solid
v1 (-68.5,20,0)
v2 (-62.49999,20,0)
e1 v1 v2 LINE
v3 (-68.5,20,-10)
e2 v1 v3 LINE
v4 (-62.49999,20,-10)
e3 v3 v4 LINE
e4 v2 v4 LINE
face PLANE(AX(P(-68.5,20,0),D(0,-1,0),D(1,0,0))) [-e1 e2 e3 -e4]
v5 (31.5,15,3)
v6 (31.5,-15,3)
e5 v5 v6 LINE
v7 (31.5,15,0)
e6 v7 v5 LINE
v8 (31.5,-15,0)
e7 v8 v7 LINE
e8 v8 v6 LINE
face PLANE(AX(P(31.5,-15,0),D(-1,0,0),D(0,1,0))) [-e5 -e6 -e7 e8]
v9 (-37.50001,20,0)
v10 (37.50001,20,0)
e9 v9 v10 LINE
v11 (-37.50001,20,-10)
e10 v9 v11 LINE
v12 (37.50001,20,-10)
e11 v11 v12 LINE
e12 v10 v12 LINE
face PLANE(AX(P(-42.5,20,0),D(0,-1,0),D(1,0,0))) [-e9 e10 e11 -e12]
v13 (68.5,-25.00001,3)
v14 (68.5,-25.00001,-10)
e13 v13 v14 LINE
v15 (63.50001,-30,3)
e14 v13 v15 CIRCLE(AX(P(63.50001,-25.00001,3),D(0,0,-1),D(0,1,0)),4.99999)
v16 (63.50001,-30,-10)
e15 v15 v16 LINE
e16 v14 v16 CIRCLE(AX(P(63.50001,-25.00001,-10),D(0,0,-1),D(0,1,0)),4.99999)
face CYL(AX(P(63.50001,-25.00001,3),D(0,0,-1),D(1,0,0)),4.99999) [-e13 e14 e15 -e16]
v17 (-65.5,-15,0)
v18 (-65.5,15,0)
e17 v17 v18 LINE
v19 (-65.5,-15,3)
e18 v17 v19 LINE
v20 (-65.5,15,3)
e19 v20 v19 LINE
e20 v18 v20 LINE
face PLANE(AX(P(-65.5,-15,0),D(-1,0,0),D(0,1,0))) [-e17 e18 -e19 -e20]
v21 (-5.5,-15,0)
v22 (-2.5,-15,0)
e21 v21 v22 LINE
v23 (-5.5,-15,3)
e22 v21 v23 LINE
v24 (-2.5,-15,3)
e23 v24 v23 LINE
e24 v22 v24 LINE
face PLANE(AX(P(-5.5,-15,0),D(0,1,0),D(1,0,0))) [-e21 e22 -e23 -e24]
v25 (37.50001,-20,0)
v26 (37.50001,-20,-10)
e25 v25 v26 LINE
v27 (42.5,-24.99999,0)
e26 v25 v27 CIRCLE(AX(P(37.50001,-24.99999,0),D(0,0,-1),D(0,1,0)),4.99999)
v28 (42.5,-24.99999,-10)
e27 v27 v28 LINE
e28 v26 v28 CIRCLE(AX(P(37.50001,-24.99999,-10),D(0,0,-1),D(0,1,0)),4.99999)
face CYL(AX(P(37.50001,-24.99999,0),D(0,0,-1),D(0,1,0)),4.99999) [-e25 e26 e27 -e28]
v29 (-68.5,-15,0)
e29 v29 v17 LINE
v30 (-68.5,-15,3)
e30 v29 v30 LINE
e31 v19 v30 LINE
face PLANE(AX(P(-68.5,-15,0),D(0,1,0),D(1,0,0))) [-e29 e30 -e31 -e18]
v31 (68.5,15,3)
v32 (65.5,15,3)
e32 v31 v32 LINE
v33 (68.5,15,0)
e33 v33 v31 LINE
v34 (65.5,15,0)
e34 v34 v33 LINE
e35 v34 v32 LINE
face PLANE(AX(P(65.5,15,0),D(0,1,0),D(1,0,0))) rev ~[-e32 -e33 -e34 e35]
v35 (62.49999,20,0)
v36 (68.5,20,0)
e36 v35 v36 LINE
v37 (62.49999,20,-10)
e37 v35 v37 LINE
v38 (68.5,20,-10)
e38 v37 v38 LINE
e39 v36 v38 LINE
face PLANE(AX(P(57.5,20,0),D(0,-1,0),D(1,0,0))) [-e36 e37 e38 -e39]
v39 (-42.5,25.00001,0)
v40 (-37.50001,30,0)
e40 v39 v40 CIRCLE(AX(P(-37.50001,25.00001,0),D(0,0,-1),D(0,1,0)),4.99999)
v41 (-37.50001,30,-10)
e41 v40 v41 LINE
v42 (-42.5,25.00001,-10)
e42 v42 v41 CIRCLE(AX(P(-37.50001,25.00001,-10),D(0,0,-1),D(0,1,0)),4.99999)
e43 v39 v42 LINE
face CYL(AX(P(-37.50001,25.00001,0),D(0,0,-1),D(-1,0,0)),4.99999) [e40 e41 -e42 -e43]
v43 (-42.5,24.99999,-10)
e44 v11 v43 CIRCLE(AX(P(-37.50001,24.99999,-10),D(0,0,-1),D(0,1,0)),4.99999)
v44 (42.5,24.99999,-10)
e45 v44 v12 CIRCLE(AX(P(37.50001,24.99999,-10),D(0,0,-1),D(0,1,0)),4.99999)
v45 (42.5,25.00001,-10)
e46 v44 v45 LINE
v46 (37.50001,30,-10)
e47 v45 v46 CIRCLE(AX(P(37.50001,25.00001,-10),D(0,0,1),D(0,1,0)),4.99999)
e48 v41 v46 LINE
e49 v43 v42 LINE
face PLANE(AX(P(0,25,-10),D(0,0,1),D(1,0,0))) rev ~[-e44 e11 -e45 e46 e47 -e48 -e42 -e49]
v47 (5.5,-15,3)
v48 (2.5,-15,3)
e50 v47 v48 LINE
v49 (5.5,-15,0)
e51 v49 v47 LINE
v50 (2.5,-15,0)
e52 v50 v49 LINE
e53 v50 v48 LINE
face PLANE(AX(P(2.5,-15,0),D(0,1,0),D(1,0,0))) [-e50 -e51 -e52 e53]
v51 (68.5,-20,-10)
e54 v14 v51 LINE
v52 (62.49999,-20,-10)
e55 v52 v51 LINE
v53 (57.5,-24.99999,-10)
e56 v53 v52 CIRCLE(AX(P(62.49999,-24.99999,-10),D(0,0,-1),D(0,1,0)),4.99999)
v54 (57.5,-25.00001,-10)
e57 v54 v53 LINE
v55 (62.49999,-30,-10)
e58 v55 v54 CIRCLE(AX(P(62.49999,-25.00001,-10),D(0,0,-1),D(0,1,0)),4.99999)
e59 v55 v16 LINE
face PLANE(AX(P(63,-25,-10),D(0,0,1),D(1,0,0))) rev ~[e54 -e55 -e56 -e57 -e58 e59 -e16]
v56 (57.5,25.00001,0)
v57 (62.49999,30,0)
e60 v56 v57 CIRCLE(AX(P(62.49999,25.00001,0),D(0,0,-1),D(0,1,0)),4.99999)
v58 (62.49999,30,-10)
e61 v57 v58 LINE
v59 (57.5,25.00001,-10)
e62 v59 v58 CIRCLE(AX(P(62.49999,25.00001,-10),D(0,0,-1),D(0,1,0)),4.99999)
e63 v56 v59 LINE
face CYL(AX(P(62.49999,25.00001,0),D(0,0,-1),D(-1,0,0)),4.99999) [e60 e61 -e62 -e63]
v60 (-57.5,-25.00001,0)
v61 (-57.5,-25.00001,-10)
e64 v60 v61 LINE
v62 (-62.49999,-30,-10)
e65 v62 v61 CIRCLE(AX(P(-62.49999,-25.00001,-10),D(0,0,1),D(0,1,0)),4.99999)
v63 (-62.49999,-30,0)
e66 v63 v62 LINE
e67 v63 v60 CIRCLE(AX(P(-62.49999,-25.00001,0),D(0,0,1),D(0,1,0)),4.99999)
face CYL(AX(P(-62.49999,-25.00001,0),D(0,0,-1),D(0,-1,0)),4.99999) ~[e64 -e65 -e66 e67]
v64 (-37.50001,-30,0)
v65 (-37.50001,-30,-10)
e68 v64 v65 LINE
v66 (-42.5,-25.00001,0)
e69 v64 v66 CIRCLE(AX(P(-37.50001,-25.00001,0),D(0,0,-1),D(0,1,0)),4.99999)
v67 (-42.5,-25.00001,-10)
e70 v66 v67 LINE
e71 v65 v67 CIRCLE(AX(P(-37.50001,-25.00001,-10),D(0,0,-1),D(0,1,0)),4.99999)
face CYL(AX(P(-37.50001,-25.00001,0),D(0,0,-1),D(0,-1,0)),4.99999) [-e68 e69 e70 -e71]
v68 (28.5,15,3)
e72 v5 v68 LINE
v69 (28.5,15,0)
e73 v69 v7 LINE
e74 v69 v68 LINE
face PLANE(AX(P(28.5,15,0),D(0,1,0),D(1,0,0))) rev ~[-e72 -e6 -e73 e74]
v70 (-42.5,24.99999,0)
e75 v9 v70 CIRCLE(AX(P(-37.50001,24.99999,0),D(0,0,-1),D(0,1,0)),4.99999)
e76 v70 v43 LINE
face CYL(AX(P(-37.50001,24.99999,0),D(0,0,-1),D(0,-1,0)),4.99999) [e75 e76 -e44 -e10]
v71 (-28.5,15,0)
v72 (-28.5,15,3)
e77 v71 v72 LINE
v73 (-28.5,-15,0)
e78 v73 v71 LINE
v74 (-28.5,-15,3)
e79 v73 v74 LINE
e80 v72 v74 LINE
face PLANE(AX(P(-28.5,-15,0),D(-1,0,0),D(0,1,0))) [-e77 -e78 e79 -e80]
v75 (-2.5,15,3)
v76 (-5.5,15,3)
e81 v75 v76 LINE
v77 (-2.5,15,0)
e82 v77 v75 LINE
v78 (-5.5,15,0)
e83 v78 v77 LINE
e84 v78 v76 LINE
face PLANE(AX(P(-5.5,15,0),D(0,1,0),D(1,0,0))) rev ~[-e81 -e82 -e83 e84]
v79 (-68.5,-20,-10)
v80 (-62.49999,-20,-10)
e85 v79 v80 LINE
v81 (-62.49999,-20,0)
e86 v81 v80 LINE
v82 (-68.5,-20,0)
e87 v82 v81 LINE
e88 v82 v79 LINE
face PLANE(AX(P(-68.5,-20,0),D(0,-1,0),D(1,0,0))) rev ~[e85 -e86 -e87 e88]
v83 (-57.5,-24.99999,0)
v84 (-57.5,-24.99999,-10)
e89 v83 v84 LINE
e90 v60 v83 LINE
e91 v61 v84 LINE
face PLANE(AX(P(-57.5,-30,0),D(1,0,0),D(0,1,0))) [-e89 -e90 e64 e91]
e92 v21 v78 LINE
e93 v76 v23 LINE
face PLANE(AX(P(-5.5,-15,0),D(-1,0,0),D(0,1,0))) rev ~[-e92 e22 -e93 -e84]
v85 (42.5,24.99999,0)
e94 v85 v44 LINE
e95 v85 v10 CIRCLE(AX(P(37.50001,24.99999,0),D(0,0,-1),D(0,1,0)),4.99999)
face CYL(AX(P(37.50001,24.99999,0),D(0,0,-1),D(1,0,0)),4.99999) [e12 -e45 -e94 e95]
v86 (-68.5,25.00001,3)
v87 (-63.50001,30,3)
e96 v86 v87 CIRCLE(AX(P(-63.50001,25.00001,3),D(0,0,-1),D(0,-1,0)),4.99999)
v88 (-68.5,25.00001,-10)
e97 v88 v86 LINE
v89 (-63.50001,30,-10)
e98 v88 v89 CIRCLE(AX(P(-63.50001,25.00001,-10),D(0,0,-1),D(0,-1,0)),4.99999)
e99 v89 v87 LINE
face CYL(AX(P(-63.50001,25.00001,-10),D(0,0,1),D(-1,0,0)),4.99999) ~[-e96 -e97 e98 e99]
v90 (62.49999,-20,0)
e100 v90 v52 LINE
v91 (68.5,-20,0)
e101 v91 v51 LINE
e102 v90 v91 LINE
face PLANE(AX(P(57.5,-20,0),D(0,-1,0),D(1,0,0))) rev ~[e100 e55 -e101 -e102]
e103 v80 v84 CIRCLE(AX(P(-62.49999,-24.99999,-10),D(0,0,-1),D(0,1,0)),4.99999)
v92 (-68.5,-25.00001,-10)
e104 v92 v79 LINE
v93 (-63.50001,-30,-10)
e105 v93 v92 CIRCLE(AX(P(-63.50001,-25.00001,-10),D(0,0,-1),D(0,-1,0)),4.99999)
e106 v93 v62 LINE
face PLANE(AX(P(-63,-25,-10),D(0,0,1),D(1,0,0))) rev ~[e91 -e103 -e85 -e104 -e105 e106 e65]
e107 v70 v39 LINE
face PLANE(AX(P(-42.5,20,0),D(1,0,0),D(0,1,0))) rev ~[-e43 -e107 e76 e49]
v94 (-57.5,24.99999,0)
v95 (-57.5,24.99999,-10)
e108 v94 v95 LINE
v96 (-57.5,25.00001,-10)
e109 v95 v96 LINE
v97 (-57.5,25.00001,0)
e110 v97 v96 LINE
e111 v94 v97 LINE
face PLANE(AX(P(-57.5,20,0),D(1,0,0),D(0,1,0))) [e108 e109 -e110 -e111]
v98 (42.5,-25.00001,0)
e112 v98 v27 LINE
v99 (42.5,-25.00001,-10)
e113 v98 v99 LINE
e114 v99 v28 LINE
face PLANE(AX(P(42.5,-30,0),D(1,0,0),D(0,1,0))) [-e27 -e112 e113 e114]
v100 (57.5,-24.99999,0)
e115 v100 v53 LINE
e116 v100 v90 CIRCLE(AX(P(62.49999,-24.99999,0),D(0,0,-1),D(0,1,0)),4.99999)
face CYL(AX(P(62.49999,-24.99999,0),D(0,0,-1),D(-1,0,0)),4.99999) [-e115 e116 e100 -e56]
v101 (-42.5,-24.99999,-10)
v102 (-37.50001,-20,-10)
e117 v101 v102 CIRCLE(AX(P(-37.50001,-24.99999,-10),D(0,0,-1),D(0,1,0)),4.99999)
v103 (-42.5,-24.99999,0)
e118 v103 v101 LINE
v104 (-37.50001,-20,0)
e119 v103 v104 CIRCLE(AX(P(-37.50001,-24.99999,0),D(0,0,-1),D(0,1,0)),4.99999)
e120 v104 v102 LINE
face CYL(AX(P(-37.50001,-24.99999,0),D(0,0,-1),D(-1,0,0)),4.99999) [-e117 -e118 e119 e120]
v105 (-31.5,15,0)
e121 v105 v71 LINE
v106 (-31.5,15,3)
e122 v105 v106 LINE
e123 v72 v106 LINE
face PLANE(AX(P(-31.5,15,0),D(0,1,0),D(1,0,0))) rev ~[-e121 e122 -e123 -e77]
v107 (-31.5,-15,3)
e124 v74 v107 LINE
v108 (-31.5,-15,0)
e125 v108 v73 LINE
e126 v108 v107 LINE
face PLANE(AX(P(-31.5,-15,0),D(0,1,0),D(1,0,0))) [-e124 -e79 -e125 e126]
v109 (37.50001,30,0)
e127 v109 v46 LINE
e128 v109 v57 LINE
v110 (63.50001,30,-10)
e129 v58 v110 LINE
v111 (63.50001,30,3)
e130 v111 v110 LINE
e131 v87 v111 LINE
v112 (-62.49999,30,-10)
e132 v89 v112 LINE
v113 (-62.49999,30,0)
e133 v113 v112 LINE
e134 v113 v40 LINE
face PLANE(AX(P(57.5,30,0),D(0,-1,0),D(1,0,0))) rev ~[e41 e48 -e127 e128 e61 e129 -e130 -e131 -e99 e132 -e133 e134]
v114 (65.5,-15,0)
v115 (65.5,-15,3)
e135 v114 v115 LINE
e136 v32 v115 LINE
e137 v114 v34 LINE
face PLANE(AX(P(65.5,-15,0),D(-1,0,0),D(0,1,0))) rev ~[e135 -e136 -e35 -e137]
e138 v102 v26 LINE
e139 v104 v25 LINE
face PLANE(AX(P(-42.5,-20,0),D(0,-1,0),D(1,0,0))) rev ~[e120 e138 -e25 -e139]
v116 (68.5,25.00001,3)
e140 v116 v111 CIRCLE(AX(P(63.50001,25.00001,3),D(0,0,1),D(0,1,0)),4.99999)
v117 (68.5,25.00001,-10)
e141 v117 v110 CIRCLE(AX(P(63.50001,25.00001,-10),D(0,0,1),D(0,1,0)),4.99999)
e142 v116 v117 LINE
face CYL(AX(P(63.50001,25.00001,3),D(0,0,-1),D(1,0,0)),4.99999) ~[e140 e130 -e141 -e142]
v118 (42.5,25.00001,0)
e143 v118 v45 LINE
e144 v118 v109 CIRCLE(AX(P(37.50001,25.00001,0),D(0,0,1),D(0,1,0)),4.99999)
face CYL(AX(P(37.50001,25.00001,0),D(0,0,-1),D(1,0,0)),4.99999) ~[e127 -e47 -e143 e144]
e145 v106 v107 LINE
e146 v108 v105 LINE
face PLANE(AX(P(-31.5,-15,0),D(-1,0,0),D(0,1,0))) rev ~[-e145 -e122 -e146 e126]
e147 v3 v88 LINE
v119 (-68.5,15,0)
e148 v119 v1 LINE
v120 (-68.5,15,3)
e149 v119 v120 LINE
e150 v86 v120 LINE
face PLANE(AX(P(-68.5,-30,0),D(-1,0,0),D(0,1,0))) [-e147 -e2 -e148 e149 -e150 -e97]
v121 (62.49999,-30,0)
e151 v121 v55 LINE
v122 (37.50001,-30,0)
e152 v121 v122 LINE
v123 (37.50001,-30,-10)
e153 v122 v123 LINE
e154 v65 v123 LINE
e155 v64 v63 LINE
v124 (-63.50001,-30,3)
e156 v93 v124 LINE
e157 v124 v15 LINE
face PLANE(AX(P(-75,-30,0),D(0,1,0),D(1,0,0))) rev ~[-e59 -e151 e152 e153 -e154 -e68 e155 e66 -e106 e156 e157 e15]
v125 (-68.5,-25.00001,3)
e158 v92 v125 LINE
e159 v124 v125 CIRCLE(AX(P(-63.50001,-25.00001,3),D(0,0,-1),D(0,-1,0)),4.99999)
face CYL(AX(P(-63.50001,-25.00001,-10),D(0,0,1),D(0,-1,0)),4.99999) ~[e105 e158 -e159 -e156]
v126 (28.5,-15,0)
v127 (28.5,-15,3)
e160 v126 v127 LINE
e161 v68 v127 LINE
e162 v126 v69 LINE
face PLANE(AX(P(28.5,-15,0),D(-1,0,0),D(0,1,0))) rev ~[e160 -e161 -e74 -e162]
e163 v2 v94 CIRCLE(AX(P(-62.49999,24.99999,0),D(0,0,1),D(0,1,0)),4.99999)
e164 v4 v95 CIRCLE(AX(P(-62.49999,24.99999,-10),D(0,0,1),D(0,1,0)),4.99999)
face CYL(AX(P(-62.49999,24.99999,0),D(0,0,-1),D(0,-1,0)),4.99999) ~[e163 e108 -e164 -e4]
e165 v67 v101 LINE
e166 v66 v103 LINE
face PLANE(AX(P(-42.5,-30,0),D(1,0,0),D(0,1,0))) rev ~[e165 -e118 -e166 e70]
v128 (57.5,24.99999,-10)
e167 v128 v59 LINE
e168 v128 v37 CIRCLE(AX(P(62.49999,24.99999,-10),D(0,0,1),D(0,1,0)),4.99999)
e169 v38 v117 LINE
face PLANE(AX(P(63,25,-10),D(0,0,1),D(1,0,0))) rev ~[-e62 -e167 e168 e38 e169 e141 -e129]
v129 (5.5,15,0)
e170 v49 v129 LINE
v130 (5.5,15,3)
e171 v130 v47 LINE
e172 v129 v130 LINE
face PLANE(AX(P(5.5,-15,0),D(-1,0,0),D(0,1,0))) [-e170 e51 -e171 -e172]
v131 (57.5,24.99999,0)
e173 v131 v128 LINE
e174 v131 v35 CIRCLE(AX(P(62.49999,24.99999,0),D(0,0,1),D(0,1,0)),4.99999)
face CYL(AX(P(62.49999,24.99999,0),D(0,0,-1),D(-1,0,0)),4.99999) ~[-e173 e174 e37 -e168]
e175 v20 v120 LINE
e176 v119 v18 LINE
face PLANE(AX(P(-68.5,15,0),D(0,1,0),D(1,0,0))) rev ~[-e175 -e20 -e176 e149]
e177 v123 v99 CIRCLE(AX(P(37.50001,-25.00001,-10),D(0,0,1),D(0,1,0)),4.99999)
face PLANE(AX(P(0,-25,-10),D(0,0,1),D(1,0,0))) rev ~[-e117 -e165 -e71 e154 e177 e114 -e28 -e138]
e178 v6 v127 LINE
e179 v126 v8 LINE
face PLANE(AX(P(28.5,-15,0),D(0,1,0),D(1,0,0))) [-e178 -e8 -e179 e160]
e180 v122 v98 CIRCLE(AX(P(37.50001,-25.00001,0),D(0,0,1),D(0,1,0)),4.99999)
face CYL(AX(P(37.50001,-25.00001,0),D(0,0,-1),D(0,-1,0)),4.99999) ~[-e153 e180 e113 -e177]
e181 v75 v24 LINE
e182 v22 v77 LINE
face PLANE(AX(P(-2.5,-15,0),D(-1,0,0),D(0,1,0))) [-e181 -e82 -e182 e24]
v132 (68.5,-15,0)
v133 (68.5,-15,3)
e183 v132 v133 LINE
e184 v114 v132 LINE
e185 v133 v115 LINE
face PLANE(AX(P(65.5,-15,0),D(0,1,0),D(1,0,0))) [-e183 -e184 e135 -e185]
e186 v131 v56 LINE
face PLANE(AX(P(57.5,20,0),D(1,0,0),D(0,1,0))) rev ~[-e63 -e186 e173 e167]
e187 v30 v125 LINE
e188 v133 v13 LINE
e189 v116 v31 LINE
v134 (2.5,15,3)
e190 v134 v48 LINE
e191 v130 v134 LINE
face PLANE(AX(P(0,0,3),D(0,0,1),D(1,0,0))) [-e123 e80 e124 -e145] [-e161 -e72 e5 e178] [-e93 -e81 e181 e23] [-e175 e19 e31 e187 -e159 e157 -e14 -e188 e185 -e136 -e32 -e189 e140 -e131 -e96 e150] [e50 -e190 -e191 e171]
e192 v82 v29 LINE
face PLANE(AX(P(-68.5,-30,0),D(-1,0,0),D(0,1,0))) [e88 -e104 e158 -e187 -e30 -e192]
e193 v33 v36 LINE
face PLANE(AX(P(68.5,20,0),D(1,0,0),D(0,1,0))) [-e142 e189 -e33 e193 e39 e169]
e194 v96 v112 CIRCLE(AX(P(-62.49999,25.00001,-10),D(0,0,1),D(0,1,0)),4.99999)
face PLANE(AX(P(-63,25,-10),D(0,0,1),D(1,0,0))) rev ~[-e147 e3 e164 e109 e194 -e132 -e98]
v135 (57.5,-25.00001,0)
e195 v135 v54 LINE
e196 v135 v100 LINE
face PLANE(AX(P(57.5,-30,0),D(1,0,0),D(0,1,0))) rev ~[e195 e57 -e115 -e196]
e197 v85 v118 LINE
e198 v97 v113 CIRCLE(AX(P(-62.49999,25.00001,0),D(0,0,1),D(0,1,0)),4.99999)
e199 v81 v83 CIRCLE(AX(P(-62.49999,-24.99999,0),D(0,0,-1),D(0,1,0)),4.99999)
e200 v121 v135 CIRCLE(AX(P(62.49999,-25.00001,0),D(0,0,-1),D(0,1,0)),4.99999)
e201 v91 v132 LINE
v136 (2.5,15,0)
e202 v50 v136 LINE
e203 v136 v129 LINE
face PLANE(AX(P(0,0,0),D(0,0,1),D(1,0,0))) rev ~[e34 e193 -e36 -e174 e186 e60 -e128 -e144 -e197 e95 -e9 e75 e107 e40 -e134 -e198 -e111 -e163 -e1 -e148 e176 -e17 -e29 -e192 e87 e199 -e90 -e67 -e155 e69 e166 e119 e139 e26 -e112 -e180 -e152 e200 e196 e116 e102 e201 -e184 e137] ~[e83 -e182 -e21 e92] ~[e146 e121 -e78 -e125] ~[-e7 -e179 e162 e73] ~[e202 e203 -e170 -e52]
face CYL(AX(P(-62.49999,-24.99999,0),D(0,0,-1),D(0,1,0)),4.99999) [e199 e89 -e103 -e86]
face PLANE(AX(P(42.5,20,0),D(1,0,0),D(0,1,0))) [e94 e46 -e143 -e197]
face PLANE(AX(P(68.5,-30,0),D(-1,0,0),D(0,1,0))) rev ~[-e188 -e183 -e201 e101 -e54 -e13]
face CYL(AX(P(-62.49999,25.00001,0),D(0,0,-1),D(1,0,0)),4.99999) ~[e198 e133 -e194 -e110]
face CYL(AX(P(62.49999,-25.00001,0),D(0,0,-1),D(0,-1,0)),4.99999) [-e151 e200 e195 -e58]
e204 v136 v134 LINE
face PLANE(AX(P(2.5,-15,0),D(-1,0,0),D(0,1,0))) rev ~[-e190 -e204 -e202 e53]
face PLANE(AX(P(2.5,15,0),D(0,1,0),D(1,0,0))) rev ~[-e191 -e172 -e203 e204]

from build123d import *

# Parameters (mm, degrees)
F0_W     = 150
F0_H     = 60
F1_DEPTH = 3
F2_W     = 3
F2_H     = 30
F3_DEPTH = 25
F4_W     = 6.5
F4_H     = 60
F5_DEPTH = 25
F6_W     = 85
F6_H     = 10
F6_W_2   = 11
F7_DEPTH = 10
F8_R     = 4.99999


# Not quite as in the source:
# - a fillet or chamfer is up to 0.001 mm smaller than in the source, because OpenCascade refuses the exact size


with BuildPart() as f1:
    # F0 (on Top) → F1 (new body)
    with BuildSketch(Plane.XY):
        Rectangle(F0_W, F0_H)
    extrude(amount=F1_DEPTH)

    # F2 (on Top) → F3 (cut)
    with BuildSketch(Plane.XY):
        with Locations((-4, 0)):
            Rectangle(F2_W, F2_H)
        with Locations((4, 0)):
            Rectangle(F2_W, F2_H)
        with Locations((67, 0)):
            Rectangle(F2_W, F2_H)
        with Locations((-67, 0)):
            Rectangle(F2_W, F2_H)
        with Locations((-30, 0)):
            Rectangle(F2_W, F2_H)
        with Locations((30, 0)):
            Rectangle(F2_W, F2_H)
    extrude(amount=F3_DEPTH, mode=Mode.SUBTRACT)

    # F4 (on Top) → F5 (cut)
    with BuildSketch(Plane.XY):
        with Locations((71.75, 0)):
            Rectangle(F4_W, F4_H)
        with Locations((-71.75, 0)):
            Rectangle(F4_W, F4_H)
    extrude(amount=F5_DEPTH, mode=Mode.SUBTRACT)

    # F6 (on Top) → F7 (join)
    with BuildSketch(Plane.XY):
        with Locations((0, 25)):
            Rectangle(F6_W, F6_H)
        with Locations((0, -25)):
            Rectangle(F6_W, F6_H)
        with Locations((63, 25)):
            Rectangle(F6_W_2, F6_H)
        with Locations((63, -25)):
            Rectangle(F6_W_2, F6_H)
        with Locations((-63, -25)):
            Rectangle(F6_W_2, F6_H)
        with Locations((-63, 25)):
            Rectangle(F6_W_2, F6_H)
    extrude(amount=-F7_DEPTH)

    # F8 (radius 5 in the source; OpenCascade refuses exactly that, so slightly less here)
    f8_edges = [f1.edges().sort_by_distance(p)[0] for p in [
        (-68.5, -30, -3.5),
        (-68.5, 30, -3.5),
        (68.5, 30, -3.5),
        (68.5, -30, -3.5),
        (42.5, 30, -5),
        (42.5, 20, -5),
        (42.5, -20, -5),
        (42.5, -30, -5),
        (57.5, 30, -5),
        (57.5, 20, -5),
        (57.5, -20, -5),
        (57.5, -30, -5),
        (-42.5, 30, -5),
        (-42.5, 20, -5),
        (-42.5, -20, -5),
        (-42.5, -30, -5),
        (-57.5, 30, -5),
        (-57.5, 20, -5),
        (-57.5, -20, -5),
        (-57.5, -30, -5),
    ]]
    fillet(f8_edges, radius=F8_R)


solid = f1.part
